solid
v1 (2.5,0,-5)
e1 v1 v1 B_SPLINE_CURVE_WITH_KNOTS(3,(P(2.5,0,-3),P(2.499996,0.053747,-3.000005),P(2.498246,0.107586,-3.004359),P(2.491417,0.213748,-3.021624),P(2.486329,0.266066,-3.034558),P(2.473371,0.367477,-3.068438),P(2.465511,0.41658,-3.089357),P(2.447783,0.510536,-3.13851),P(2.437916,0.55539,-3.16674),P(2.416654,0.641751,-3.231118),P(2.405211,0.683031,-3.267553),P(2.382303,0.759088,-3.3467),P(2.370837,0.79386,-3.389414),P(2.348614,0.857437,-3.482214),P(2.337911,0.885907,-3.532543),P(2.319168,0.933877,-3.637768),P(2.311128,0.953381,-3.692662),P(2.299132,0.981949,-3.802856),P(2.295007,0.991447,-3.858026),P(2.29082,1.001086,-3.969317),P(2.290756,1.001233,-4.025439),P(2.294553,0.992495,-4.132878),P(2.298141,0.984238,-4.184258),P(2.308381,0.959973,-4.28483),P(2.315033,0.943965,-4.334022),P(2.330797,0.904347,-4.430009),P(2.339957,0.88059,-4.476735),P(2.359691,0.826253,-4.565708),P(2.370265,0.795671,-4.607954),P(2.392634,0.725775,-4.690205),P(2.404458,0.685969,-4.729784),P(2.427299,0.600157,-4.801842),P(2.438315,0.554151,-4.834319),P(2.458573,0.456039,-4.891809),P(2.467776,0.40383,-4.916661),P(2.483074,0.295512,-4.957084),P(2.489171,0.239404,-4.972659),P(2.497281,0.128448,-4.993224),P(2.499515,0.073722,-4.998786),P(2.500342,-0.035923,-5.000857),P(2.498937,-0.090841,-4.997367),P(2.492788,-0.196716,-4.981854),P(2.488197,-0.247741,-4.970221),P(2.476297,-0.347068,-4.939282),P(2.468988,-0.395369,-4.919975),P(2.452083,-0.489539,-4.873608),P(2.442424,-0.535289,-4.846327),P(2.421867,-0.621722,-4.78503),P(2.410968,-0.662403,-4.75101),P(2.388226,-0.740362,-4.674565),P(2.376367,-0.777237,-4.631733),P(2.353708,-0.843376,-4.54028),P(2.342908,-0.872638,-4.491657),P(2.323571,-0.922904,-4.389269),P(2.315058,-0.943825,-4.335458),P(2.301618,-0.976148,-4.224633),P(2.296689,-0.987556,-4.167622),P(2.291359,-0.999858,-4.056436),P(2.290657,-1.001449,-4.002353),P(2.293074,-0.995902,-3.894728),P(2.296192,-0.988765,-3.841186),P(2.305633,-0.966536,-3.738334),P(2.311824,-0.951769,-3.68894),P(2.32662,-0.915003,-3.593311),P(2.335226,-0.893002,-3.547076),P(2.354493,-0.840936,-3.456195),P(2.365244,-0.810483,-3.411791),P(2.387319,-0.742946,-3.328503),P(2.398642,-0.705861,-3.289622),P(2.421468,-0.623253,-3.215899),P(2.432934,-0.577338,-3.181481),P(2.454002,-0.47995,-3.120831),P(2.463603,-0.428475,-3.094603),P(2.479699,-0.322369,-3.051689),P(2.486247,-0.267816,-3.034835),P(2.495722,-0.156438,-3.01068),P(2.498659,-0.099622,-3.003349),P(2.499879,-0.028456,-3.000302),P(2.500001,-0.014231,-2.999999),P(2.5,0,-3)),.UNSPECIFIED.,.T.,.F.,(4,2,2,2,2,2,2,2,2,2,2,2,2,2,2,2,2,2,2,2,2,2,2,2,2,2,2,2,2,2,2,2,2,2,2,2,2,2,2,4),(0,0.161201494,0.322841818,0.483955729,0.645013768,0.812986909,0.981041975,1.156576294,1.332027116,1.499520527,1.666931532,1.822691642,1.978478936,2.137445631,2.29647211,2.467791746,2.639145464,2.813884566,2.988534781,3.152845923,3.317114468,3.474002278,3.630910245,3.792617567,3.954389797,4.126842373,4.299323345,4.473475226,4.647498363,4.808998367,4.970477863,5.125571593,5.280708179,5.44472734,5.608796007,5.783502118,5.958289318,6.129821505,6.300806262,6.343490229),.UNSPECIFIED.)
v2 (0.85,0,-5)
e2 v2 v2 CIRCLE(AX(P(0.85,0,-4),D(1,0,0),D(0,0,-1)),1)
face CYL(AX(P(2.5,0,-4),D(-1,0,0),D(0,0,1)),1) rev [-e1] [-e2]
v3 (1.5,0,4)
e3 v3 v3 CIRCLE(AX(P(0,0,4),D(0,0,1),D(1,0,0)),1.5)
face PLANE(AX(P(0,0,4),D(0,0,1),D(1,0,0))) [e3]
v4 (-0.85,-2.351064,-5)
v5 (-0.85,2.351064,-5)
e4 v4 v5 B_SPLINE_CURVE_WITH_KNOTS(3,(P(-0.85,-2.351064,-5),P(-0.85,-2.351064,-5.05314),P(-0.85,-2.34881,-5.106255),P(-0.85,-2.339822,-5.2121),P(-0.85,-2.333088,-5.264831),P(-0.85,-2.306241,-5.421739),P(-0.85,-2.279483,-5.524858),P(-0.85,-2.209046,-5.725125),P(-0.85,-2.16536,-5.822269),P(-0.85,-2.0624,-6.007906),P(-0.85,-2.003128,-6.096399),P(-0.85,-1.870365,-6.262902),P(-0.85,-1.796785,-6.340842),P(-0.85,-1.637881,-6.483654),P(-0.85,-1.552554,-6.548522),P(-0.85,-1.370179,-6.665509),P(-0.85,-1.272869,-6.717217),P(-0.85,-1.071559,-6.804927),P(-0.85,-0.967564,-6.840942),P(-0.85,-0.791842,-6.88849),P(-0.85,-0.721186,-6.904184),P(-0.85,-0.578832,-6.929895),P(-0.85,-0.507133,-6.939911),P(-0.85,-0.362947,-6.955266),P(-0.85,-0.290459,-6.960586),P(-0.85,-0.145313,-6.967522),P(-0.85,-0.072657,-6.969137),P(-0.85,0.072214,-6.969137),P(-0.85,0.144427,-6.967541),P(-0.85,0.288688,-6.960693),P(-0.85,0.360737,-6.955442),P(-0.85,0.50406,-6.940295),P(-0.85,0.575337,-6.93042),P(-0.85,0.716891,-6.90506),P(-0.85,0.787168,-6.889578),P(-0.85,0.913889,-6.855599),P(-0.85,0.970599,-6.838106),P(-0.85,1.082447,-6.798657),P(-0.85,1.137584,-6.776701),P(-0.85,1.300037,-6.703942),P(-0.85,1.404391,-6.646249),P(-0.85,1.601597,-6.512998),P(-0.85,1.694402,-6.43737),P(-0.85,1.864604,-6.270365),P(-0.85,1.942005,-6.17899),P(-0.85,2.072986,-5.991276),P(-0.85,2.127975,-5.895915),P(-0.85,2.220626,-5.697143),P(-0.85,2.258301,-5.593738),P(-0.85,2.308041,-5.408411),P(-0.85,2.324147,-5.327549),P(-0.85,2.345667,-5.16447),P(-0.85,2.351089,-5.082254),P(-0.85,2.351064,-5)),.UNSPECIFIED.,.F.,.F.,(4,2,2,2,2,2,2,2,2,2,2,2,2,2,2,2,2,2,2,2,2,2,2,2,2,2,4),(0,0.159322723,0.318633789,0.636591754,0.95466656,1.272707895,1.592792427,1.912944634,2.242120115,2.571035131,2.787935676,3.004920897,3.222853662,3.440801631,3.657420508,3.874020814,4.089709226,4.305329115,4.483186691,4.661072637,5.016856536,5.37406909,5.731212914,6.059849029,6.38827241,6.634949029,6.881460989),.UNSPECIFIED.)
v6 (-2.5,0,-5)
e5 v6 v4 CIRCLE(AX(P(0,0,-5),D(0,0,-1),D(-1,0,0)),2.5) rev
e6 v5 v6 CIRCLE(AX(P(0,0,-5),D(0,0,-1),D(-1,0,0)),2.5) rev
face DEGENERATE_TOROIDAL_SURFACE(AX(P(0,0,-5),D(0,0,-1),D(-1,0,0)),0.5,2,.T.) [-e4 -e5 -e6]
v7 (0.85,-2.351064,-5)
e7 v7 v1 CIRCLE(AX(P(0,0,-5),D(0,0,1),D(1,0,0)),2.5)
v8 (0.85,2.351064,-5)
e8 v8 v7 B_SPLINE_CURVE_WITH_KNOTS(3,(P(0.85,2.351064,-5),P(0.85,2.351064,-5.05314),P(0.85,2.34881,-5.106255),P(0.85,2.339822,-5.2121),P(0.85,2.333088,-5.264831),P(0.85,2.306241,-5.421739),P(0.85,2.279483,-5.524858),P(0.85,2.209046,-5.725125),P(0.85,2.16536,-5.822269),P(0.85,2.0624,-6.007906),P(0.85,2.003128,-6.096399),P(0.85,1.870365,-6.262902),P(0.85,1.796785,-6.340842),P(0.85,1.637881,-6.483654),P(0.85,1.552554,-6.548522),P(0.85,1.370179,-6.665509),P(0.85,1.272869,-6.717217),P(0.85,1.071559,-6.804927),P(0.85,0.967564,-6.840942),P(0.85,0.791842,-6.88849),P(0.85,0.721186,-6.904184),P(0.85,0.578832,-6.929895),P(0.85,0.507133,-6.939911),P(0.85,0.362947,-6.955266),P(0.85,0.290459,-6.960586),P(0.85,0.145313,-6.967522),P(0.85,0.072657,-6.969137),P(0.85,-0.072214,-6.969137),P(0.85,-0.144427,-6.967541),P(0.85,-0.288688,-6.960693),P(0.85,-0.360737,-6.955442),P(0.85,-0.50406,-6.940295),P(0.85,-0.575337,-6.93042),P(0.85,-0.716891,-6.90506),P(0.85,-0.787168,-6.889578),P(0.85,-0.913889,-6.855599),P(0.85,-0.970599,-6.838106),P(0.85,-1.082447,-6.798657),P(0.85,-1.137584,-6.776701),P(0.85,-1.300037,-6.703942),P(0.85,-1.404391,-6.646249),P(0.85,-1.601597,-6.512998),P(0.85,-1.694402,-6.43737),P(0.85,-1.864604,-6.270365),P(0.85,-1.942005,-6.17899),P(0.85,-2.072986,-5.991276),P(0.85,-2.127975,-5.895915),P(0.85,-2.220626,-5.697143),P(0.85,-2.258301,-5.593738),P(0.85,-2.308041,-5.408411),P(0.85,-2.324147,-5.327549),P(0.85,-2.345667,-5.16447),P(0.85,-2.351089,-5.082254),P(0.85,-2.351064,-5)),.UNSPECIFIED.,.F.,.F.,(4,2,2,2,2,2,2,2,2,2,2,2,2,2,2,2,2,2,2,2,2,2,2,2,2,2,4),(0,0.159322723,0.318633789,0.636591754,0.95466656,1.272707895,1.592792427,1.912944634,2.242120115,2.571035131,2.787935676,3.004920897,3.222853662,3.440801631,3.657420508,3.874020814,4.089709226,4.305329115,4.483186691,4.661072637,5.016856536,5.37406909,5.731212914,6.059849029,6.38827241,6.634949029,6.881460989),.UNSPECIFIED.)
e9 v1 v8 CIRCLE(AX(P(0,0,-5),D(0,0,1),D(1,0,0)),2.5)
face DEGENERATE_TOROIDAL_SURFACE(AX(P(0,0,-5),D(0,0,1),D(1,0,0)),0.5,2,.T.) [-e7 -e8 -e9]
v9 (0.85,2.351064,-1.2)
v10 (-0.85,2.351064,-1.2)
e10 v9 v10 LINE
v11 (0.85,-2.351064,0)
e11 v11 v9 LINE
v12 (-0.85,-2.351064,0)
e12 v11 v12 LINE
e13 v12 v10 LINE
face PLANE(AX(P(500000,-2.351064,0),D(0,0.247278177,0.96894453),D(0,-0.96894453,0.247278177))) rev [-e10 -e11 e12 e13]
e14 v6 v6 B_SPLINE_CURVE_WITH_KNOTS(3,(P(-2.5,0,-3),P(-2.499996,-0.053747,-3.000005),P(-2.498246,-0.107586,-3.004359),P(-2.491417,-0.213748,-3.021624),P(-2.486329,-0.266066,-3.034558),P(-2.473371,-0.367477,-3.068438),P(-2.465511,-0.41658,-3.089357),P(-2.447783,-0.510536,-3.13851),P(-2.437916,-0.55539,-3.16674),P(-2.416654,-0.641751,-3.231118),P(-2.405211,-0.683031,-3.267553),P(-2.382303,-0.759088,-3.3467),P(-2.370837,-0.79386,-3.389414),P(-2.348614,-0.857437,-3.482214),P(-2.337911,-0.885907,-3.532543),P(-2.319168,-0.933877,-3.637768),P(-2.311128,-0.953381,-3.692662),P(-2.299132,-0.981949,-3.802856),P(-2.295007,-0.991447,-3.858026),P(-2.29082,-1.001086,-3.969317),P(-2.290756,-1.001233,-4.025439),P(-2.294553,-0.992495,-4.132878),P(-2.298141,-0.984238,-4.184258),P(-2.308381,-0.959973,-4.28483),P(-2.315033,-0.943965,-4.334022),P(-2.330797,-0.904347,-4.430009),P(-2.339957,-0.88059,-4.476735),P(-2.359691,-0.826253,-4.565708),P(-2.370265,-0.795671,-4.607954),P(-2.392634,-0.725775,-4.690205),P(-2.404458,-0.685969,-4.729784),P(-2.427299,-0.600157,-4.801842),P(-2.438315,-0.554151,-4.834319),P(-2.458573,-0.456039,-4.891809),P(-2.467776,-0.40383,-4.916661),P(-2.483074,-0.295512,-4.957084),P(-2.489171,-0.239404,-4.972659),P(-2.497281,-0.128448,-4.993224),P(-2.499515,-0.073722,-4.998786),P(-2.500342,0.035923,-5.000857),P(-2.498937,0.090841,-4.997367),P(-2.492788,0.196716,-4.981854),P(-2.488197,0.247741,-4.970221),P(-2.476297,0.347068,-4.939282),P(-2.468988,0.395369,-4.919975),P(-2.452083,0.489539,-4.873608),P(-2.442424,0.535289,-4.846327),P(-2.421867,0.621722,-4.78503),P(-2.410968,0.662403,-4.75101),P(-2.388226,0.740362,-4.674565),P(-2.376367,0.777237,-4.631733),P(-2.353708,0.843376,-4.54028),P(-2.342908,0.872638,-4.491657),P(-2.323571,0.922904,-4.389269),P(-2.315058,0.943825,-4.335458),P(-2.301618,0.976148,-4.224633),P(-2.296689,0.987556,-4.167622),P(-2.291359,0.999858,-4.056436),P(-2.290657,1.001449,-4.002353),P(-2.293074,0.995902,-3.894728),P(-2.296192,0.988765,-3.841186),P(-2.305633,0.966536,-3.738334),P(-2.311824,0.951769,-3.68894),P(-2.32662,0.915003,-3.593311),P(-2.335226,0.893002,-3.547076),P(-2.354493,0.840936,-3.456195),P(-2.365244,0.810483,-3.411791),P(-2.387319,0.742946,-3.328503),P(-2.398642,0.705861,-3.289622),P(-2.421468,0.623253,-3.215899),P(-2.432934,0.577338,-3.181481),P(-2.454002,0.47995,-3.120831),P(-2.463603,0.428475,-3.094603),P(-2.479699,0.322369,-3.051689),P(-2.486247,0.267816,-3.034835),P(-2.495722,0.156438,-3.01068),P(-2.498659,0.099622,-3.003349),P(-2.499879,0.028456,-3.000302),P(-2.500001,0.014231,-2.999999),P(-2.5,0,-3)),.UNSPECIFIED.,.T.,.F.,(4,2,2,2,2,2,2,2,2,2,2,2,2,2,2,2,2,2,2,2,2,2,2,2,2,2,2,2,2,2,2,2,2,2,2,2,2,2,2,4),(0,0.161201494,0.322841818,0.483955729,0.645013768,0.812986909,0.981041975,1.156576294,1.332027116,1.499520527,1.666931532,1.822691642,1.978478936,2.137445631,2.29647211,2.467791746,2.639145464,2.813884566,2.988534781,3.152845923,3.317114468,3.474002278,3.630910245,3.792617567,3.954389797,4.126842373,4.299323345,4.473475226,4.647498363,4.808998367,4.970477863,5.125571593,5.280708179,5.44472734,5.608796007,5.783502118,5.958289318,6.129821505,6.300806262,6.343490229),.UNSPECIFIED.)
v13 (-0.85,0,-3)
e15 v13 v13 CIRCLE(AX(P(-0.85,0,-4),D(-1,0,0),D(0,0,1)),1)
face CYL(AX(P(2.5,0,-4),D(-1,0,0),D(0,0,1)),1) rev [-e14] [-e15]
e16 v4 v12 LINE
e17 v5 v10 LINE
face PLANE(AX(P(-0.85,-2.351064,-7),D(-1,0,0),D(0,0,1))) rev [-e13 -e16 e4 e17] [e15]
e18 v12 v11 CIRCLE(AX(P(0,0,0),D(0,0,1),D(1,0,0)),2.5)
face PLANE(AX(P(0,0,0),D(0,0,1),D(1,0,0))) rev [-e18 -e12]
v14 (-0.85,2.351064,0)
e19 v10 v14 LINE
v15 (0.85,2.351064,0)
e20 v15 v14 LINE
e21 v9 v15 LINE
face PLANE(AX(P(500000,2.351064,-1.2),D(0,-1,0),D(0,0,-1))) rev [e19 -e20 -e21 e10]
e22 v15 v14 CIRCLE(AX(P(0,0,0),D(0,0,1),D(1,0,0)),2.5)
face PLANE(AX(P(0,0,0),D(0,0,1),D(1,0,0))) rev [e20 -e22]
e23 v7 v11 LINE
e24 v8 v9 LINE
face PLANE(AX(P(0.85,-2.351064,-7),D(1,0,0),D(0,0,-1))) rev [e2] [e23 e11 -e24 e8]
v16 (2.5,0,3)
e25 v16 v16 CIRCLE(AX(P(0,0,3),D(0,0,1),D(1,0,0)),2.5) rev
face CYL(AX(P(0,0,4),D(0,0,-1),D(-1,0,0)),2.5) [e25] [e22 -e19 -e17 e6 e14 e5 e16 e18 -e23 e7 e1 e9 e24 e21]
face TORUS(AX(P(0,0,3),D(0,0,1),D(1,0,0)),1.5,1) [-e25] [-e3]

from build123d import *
from build123d.topology import SkipClean

# Parameters (mm, degrees)
ESQUISSE1_R                  = 2.5
BOSS_EXTRU_1_DEPTH           = 4
BOSS_EXTRU_2_START           = 7
BOSS_EXTRU_2_DEPTH           = 7
ENL_V_MAT_EXTRU_2_DEPTH      = 9.153066908
ENL_V_MAT_EXTRU_2_DEPTH_BACK = 9.153066908
ESQUISSE3_R                  = 1
CONG_1_R                     = 2
BOSS_EXTRU_3_REACH           = 10.127
CONG_2_R                     = 1


# Some blends are built 0.0001 mm under size
with BuildPart() as part:
    # Esquisse1 → Boss.-Extru.1 (new body)
    with BuildSketch(Plane.XY):
        Circle(ESQUISSE1_R)
    extrude(amount=BOSS_EXTRU_1_DEPTH)

    # Esquisse2 → Boss.-Extru.2 (add)
    with SkipClean():  # the faces are left unmerged after this step: merging them gives an invalid solid
        with BuildSketch(Plane(origin=(0, 0, 0), x_dir=(-1, 0, 0), z_dir=(0, 0, -1)).offset(BOSS_EXTRU_2_START)):
            with BuildLine():
                Line((0.85, -2.351063589), (0.85, 2.351063589))
                ThreePointArc((0.85, 2.351063589), (2.5, 0), (0.85, -2.351063589))
            make_face()
            with BuildLine():
                Line((-0.85, -2.351063589), (-0.85, 2.351063589))
                ThreePointArc((-0.85, 2.351063589), (-2.5, 0), (-0.85, -2.351063589))
            make_face()
        extrude(amount=-BOSS_EXTRU_2_DEPTH)

    # Esquisse3 → Enlèv. mat.-Extru.2 (cut, two sides: drawn at the far end of the back side and taken through both)
    with SkipClean():  # the faces are left unmerged after this step: merging them gives an invalid solid
        with BuildSketch(Plane.ZY.offset(-0.85).offset(-ENL_V_MAT_EXTRU_2_DEPTH_BACK)):
            with Locations((-4, 0)):
                Circle(ESQUISSE3_R)
        extrude(amount=ENL_V_MAT_EXTRU_2_DEPTH + ENL_V_MAT_EXTRU_2_DEPTH_BACK, mode=Mode.SUBTRACT)

    # Congé1
    # the kernel refuses this fillet: 2 mm, written as the material it takes off along each edge
    with BuildSketch(Plane(origin=(0, 0, -7), x_dir=(0.9999950652018581, 0.003141587485879649, 0), z_dir=(0.003141587485879649, -0.9999950652018581, 0))) as cong_1_piece_1:
        with BuildLine():
            CenterArc((2.5 - CONG_1_R, CONG_1_R), CONG_1_R, 270, 90)
            Line((2.5 - CONG_1_R, 0), (2.5, 0))
            Line((2.5, 0), (2.5, CONG_1_R))
        make_face()
    revolve(axis=Axis((0, 0, -7), (0, 0, 1)), revolution_arc=359.64, mode=Mode.SUBTRACT)
    with BuildSketch(Plane(origin=(0, 0, -7), x_dir=(-0.9999950652018581, 0.003141587485879604, 0), z_dir=(-0.003141587485879604, -0.9999950652018581, 0))) as cong_1_piece_2:
        with BuildLine():
            CenterArc((2.5 - CONG_1_R, -CONG_1_R), CONG_1_R, 0, 90)
            Line((2.5 - CONG_1_R, 0), (2.5, 0))
            Line((2.5, 0), (2.5, -CONG_1_R))
        make_face()
    revolve(axis=Axis((0, 0, -7), (0, 0, -1)), revolution_arc=359.64, mode=Mode.SUBTRACT)

    # Esquisse4 → Boss.-Extru.3 (add, up to next)
    with BuildSketch(Plane(origin=(-0.85, 0, 0), x_dir=(0, 0, -1), z_dir=(1, 0, 0)), mode=Mode.PRIVATE) as boss_extru_3_sk1:
        Polygon((0, -2.351063589), (1.2, 2.351063589), (0, 2.351063589), align=None)
    boss_extru_3_tool1 = extrude(boss_extru_3_sk1.sketch, amount=BOSS_EXTRU_3_REACH, mode=Mode.PRIVATE) - part.part
    add(boss_extru_3_tool1.solids().sort_by_distance((-0.85, 0.783688, -0.4))[0])

    # Congé2
    cong_2_edges = [part.edges().sort_by_distance(p)[0] for p in [
        (-2.5, 0, 4),
    ]]
    fillet(cong_2_edges, radius=CONG_2_R - 0.0001)  # a hair under: the kernel refuses the full size


solid = part.part
